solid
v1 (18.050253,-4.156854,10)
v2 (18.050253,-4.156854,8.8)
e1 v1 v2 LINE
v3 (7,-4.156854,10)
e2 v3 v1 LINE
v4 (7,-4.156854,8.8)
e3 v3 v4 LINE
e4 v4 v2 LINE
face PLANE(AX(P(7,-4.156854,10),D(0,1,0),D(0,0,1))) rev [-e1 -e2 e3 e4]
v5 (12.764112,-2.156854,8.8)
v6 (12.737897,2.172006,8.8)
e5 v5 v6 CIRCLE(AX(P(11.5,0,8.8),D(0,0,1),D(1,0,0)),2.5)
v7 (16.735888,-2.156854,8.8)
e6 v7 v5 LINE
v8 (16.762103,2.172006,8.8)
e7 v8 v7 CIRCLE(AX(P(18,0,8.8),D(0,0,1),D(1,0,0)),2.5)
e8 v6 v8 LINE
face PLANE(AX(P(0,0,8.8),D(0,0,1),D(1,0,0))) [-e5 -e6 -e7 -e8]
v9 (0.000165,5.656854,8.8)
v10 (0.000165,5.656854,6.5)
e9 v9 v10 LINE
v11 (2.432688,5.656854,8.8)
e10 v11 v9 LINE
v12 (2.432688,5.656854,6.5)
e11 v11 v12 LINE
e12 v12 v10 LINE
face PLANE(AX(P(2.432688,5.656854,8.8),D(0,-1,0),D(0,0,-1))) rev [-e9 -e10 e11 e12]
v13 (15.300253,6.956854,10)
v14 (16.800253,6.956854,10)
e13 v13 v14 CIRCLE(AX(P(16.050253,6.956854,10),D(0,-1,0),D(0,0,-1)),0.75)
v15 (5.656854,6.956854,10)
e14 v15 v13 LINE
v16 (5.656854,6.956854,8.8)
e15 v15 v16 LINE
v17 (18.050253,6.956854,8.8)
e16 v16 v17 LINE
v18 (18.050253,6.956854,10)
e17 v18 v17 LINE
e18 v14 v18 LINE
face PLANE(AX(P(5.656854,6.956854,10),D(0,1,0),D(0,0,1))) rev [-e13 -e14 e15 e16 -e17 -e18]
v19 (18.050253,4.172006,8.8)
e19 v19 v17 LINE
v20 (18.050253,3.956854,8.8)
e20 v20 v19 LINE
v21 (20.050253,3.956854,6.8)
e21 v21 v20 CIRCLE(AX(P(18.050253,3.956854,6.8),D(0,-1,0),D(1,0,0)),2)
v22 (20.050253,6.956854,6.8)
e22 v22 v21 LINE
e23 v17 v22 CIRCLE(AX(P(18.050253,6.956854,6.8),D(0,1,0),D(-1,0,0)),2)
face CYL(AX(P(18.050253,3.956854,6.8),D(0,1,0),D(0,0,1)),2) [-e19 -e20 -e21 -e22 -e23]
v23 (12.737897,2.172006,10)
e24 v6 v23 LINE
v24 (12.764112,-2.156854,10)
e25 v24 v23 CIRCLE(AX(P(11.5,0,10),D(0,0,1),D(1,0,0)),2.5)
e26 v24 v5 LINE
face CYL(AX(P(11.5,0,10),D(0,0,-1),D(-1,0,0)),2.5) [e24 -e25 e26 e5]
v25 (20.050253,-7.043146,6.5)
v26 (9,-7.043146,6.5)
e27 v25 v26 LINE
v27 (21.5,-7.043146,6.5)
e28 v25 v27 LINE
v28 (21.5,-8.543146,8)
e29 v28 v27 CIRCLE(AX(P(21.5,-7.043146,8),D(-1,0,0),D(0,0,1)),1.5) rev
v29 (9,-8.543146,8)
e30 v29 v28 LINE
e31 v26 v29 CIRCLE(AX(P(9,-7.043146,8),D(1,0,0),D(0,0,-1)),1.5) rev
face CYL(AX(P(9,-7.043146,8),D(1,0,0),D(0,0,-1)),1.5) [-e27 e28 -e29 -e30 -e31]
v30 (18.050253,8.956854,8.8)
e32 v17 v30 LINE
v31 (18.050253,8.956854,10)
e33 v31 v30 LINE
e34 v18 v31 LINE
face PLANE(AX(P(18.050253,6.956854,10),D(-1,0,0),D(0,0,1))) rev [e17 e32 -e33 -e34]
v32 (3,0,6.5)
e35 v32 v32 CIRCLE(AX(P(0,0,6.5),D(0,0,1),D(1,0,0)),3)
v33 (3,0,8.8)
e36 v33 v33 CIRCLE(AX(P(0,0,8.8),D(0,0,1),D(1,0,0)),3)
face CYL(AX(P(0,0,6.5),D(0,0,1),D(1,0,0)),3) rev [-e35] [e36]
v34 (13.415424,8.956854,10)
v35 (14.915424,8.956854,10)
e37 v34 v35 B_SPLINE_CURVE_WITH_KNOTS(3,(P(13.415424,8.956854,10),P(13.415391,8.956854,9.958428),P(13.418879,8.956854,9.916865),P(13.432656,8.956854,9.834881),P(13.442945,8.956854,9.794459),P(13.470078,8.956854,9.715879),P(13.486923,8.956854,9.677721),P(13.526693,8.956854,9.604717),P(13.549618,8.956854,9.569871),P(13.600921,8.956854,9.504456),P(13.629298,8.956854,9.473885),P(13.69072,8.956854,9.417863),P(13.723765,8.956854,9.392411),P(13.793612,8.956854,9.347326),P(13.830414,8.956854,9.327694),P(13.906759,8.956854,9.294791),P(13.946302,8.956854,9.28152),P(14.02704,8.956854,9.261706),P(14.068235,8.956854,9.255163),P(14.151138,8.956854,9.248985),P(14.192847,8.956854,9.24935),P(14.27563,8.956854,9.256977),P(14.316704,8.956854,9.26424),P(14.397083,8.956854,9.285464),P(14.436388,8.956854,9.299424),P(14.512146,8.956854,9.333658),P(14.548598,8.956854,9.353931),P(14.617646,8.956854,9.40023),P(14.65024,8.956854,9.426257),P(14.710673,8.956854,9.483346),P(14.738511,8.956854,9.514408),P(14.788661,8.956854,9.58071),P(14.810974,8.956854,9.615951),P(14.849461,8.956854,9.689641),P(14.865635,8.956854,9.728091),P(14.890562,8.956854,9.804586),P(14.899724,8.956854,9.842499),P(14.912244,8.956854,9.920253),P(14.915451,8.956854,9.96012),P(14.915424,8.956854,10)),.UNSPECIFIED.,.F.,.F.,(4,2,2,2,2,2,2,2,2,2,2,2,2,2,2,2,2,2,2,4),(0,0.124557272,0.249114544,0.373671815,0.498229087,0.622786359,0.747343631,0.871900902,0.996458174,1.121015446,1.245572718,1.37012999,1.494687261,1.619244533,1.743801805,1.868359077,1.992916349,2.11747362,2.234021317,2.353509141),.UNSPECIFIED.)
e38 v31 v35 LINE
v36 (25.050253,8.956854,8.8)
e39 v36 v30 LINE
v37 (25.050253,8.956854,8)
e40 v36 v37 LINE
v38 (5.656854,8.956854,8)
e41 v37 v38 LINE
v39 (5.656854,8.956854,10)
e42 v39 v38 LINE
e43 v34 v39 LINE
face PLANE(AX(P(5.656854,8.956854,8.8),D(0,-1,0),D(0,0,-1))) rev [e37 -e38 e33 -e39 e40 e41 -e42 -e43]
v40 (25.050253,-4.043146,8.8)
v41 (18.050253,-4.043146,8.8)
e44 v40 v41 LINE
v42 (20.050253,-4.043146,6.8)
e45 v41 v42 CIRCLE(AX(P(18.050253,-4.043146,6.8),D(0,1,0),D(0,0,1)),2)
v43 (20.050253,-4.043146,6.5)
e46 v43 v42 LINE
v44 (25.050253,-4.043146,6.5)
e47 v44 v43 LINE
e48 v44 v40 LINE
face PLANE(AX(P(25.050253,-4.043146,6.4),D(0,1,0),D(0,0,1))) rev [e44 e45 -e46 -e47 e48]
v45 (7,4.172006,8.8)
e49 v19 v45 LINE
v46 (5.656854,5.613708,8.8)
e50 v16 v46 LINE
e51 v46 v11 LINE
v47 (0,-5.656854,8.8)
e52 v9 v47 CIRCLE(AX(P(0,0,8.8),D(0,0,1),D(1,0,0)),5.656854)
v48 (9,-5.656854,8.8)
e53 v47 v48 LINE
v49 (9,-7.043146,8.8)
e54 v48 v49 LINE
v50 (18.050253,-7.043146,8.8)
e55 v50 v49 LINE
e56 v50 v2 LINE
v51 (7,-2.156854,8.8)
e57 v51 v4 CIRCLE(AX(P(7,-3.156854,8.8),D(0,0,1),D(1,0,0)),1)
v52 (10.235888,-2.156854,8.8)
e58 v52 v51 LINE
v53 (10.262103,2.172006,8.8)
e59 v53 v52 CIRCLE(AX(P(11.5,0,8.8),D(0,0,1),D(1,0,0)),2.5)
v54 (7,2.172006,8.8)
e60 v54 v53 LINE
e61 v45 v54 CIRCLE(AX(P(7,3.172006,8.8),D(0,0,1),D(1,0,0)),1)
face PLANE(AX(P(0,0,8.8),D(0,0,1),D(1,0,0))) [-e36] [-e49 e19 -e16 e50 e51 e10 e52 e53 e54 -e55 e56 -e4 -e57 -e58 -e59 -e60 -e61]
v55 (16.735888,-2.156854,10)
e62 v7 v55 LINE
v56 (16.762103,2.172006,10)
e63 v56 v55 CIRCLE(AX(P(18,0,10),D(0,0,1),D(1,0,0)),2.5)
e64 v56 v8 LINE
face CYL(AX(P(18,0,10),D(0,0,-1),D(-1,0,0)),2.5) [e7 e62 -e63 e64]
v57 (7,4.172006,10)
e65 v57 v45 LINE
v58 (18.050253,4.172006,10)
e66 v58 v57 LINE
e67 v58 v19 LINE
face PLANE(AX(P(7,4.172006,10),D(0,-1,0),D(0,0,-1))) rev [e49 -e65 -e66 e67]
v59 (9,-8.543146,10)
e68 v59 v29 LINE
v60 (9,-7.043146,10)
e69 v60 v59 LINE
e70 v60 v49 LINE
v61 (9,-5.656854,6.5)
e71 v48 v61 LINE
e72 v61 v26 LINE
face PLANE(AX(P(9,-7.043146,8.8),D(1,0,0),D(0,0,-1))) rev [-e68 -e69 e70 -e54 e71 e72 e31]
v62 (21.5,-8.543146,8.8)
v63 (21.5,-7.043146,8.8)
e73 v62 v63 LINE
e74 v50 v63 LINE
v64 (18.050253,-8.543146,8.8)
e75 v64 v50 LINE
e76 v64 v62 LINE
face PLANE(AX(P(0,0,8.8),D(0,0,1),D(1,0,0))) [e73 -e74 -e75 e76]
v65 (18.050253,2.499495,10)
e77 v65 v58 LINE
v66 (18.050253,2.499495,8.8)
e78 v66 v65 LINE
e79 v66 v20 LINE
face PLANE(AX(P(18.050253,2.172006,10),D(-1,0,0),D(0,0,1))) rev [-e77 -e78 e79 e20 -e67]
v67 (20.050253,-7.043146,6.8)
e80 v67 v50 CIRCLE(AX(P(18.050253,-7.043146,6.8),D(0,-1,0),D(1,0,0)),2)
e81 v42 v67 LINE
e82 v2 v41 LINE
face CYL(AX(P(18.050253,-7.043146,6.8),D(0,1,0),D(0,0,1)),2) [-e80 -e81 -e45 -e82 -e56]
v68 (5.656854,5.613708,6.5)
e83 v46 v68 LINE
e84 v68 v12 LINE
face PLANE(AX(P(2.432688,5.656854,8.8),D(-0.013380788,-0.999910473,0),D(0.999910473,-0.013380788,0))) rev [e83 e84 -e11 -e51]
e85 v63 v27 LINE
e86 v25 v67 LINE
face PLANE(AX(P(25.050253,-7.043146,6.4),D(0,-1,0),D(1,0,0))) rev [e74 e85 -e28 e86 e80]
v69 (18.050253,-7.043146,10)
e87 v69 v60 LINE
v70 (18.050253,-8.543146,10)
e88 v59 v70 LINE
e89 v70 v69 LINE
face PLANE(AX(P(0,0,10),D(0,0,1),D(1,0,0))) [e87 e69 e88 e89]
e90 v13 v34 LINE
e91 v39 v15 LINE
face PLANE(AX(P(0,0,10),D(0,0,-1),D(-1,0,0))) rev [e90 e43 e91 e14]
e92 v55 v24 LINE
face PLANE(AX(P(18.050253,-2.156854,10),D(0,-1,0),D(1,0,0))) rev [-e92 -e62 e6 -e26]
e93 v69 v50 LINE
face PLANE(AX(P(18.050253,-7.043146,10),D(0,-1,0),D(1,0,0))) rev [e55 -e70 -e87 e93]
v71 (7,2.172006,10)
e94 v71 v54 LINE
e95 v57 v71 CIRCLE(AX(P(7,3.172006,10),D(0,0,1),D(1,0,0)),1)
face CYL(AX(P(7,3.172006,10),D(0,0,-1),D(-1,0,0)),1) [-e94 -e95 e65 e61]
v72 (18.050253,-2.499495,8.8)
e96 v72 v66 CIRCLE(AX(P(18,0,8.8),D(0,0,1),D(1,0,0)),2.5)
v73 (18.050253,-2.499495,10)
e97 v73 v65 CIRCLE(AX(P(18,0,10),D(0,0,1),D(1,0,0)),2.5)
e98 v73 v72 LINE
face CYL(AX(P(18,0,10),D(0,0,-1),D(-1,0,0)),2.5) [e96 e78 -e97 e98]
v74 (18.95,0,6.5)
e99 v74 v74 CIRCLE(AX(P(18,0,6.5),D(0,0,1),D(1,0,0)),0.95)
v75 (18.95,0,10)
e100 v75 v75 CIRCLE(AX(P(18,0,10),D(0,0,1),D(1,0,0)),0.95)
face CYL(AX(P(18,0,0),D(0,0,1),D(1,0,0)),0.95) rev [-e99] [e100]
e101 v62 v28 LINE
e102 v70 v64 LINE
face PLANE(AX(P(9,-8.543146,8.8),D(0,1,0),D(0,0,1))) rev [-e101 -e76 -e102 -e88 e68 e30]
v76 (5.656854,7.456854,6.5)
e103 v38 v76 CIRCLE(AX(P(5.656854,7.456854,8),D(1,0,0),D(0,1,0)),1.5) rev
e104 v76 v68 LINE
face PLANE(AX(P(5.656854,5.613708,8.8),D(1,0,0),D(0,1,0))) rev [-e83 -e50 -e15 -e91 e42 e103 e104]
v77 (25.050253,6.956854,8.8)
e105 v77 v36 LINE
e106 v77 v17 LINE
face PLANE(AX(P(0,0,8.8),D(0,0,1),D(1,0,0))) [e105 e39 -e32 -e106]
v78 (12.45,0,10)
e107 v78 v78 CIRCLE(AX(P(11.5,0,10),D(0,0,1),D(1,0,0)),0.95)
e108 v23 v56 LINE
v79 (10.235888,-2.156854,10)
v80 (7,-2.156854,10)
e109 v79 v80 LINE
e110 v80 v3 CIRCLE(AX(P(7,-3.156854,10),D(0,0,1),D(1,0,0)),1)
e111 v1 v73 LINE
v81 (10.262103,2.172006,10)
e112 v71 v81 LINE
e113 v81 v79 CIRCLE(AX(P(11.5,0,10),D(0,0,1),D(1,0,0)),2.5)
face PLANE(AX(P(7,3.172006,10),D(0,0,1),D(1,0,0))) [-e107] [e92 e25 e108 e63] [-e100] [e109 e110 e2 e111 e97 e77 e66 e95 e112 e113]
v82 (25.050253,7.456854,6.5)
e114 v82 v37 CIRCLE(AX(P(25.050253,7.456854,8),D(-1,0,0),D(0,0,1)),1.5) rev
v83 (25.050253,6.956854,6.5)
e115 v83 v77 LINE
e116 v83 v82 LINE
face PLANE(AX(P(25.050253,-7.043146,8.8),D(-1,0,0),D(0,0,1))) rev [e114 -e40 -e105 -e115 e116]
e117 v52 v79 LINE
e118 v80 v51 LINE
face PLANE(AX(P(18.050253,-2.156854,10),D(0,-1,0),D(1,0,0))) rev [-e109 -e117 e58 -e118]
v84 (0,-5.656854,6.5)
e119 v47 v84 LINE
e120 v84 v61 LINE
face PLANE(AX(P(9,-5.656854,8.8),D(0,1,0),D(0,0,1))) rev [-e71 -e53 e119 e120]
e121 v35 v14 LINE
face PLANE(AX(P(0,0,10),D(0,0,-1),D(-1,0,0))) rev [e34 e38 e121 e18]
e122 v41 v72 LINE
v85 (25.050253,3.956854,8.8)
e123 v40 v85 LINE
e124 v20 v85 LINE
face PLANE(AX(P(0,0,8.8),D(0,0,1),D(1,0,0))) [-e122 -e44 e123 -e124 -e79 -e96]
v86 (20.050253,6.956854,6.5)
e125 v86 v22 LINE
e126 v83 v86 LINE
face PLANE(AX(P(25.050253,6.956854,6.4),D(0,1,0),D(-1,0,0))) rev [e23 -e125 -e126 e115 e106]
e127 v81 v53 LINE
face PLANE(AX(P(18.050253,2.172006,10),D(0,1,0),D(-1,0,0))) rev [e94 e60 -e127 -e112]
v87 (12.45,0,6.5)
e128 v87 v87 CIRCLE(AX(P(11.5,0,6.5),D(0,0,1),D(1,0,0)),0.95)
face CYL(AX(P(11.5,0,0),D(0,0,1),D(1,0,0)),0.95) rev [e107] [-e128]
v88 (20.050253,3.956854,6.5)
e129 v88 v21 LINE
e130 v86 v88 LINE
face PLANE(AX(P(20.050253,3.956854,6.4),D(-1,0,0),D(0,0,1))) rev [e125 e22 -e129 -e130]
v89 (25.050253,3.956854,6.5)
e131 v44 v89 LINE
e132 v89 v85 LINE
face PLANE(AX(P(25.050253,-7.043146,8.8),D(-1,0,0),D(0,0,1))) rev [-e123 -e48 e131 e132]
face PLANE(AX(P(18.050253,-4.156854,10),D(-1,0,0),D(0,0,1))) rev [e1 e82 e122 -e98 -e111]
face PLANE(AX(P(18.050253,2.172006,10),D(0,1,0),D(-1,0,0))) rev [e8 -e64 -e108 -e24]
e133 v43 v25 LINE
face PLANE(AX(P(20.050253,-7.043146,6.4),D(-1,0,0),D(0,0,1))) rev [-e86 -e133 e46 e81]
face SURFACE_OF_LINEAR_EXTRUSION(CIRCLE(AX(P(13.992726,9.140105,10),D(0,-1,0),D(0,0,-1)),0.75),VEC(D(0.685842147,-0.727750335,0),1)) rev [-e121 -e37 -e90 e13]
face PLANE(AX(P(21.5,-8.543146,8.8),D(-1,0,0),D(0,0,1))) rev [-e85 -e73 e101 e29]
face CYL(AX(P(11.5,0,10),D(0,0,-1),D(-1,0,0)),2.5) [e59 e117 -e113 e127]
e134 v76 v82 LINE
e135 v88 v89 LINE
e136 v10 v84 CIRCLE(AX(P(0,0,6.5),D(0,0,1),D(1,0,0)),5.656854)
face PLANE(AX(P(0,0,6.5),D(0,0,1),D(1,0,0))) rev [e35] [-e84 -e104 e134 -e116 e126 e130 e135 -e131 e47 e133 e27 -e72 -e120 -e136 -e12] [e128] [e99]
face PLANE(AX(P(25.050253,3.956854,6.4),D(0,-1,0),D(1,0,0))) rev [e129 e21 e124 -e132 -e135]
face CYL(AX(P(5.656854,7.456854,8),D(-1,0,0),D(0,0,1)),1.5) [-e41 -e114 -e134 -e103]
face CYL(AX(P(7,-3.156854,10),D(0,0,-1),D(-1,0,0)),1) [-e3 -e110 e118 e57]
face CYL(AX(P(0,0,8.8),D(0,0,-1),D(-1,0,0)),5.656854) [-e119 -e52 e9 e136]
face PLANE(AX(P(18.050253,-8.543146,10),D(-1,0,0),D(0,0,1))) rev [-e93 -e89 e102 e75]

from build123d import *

# Parameters (mm, degrees)
BOSS_EXTRUDE1_DEPTH      = 2
BOSS_EXTRUDE6_DEPTH      = 4.5
CUT_EXTRUDE6_DEPTH       = 4.5
BOSS_EXTRUDE14_DEPTH     = 2.3
SKETCH32_R               = 3
CUT_EXTRUDE7_DEPTH       = 2.3
SKETCH33_W               = 12.393398282201806
SKETCH33_H               = 2.000000000000001
BOSS_EXTRUDE15_DEPTH     = 1.2
CUT_EXTRUDE8_DEPTH       = 2.4
SKETCH43_R               = 2.5000000000000004
SKETCH43_R_2             = 2.4999999999999982
BOSS_EXTRUDE17_DEPTH     = 1.2
CUT_EXTRUDE11_DEPTH      = 29.420773915365164
CUT_EXTRUDE11_DEPTH_BACK = 29.420773915365164
SKETCH44_R               = 0.9499999999999992
SKETCH44_R_2             = 0.9500000000000008
SKETCH49_R               = 0.7500000000000021
CUT_EXTRUDE13_DEPTH      = 3
FILLET1_R                = 1.5
FILLET3_START            = -1
FILLET3_DEPTH            = 8
FILLET3_START_2          = 5
FILLET3_2_DEPTH          = 21
FILLET3_3_DEPTH          = 8
SKETCH45_R               = 1.9999999999999996
SKETCH45_R_2             = 2.000000000000003
CUT_EXTRUDE15_DEPTH      = 4
FILLET4_R                = 2
BOSS_EXTRUDE18_DEPTH     = 12
SKETCH52_R               = 1.500000000000004
SKETCH52_R_2             = 1.5000000000000007
CUT_EXTRUDE16_DEPTH      = 12


with BuildPart() as part:
    # Sketch3 → Boss-Extrude1 (new body)
    with BuildSketch(Plane.XY):
        with BuildLine():
            Line((8.000000000000002, 0), (8.999999999999995, -2.5431457505076205))
            Line((8.999999999999995, -2.5431457505076205), (8.999999999999995, -7.043145750507605))
            Line((8.999999999999995, -7.043145750507605), (21.50000000000004, -7.043145750507604))
            Line((21.50000000000004, -7.043145750507604), (25.05025253169418, -7.043145750507604))
            Line((25.05025253169418, -7.043145750507604), (25.050252531694177, 7.456854249492383))
            Line((25.050252531694177, 7.456854249492383), (5.656854249492373, 7.456854249492379))
            Line((5.656854249492373, 7.456854249492379), (5.656854249492376, 5.656854249492382))
            ThreePointArc((5.656854249492376, 5.656854249492382), (7.391036260090296, 3.061467458920721), (8.000000000000002, 0))
        make_face()
    extrude(amount=BOSS_EXTRUDE1_DEPTH)

    # Sketch22 → Boss-Extrude6 (add)
    with BuildSketch(Plane.XY.offset(2)):
        with BuildLine():
            Line((5.656854249492378, 7.456854249492383), (21.500000000000025, 7.456854249492383))
            Line((21.500000000000025, 7.456854249492383), (25.050252531694177, 7.456854249492383))
            Line((25.050252531694177, 7.456854249492383), (25.05025253169418, -7.043145750507604))
            Line((25.05025253169418, -7.043145750507604), (8.999999999999995, -7.043145750507605))
            Line((8.999999999999995, -7.043145750507605), (8.999999999999995, -2.5431457505076205))
            Line((8.999999999999995, -2.5431457505076205), (7.999999999999998, 0))
            ThreePointArc((7.999999999999998, 0), (7.391036260090291, 3.061467458920719), (5.656854249492376, 5.656854249492382))
            Line((5.656854249492376, 5.656854249492382), (5.656854249492378, 7.456854249492383))
        make_face()
    extrude(amount=BOSS_EXTRUDE6_DEPTH)

    # Sketch26 → Cut-Extrude6 (cut)
    with BuildSketch(Plane.XY.offset(2)):
        Polygon((18.098080447707712, 5.299999999999999), (2.5300524575164793, 5.299999999999999), (2.5300524575164793, 4), (18.098080447707712, 4), (25.05025253169419, 4.000000000000001), (25.05025253169419, 5.299999999999999), align=None)
    extrude(amount=CUT_EXTRUDE6_DEPTH, mode=Mode.SUBTRACT)


with BuildPart() as body_2:
    # Sketch31 → Boss-Extrude14 (new body)
    with BuildSketch(Plane.XY.offset(6.5)):
        with BuildLine():
            Line((2.4326880657739025, 5.656854247099344), (0.00016454221484158, 5.656854247099344))
            ThreePointArc((0.00016454221484158, 5.656854247099344), (-5.656854248894122, 8.227110743131e-05), (0, -5.656854249492382))
            Line((0, -5.656854249492382), (9.000000000000004, -5.656854249492382))
            Line((9.000000000000004, -5.656854249492382), (8.999999999999995, -7.043145750507605))
            Line((8.999999999999995, -7.043145750507605), (8.999999999999995, -8.543145750507605))
            Line((8.999999999999995, -8.543145750507605), (21.50000000000004, -8.543145750507605))
            Line((21.50000000000004, -8.543145750507605), (21.50000000000004, -7.043145750507605))
            Line((21.50000000000004, -7.043145750507605), (25.05025253169418, -7.043145750507604))
            Line((25.05025253169418, -7.043145750507604), (25.05025253169418, 8.956854249492379))
            Line((25.05025253169418, 8.956854249492379), (5.656854249492376, 8.956854249492379))
            Line((5.656854249492376, 8.956854249492379), (5.656854249492378, 7.456854249492383))
            Line((5.656854249492378, 7.456854249492383), (5.656854249492376, 5.613708498984764))
            Line((5.656854249492376, 5.613708498984764), (2.4326880657739025, 5.656854247099344))
        make_face()
    extrude(amount=BOSS_EXTRUDE14_DEPTH)

    # Sketch32 → Cut-Extrude7 (cut)
    with BuildSketch(Plane.XY.offset(8.799999999999999)):
        Circle(SKETCH32_R)
    extrude(amount=-CUT_EXTRUDE7_DEPTH, mode=Mode.SUBTRACT)

    # Sketch33 → Boss-Extrude15 (add)
    with BuildSketch(Plane.XY.offset(8.799999999999999)):
        with Locations((11.853553390593277, 7.956854249492379)):
            Rectangle(SKETCH33_W, SKETCH33_H)
        Polygon((9.000000000000004, -7.043145750507606), (9.000000000000004, -8.543145750507605), (18.05025253169418, -8.543145750507605), (18.05025253169418, -7.0431457505076045), align=None)
        with BuildLine():
            Line((7.000000000000003, -4.156854249492383), (18.05025253169419, -4.156854249492383))
            Line((18.05025253169419, -4.156854249492383), (18.05025253169419, -2.1568542494923824))
            Line((18.05025253169419, -2.1568542494923824), (7.000000000000003, -2.1568542494923832))
            ThreePointArc((7.000000000000003, -2.1568542494923832), (6.000000000000003, -3.1568542494923832), (7.000000000000003, -4.156854249492383))
        make_face()
        with BuildLine():
            Line((18.05025253169419, 2.172006245196199), (7.000000000000003, 2.172006245196201))
            ThreePointArc((7.000000000000003, 2.172006245196201), (6.0000000000000036, 3.1720062451962), (7.000000000000003, 4.172006245196199))
            Line((7.000000000000003, 4.172006245196199), (18.05025253169419, 4.172006245196199))
            Line((18.05025253169419, 4.172006245196199), (18.05025253169419, 2.172006245196199))
        make_face()
    extrude(amount=BOSS_EXTRUDE15_DEPTH)


with BuildPart() as cut_extrude8_tool:
    # Sketch35 → Cut-Extrude8 (new body)
    with BuildSketch(Plane.XY.offset(8.799999999999999)):
        Polygon((25.05025253169418, 3.956854249492379), (25.05025253169418, 6.9568542494923795), (20.05025253169418, 6.956854249492378), (20.05025253169418, 3.9568542494923773), align=None)
        Polygon((25.05025253169418, -7.043145750507604), (20.05025253169419, -7.0431457505076045), (20.05025253169419, -4.043145750507604), (25.05025253169418, -4.043145750507604), align=None)
    extrude(amount=-CUT_EXTRUDE8_DEPTH)


with BuildPart() as part_1:
    add(part.part)

    # Cut-Extrude8: cut by cut_extrude8_tool
    add(cut_extrude8_tool.part, mode=Mode.SUBTRACT)


with BuildPart() as body_2_1:
    add(body_2.part)

    # Cut-Extrude8: cut by cut_extrude8_tool
    add(cut_extrude8_tool.part, mode=Mode.SUBTRACT)

    # Sketch43 → Boss-Extrude17 (add)
    with BuildSketch(Plane.XY.offset(8.799999999999999)):
        with Locations((11.500000000000004, 0)):
            Circle(SKETCH43_R)
        with Locations((18.000000000000004, 0)):
            Circle(SKETCH43_R_2)
    extrude(amount=BOSS_EXTRUDE17_DEPTH)


with BuildPart() as cut_extrude11_tool:
    # Sketch44 → Cut-Extrude11 (new, two sides: drawn at the far end of the back side and taken through both)
    with BuildSketch(Plane.XY.offset(9.999999999999998).offset(-CUT_EXTRUDE11_DEPTH_BACK)):
        with Locations((11.500000000000004, 0)):
            Circle(SKETCH44_R)
        with Locations((18.000000000000004, 0)):
            Circle(SKETCH44_R_2)
    extrude(amount=CUT_EXTRUDE11_DEPTH + CUT_EXTRUDE11_DEPTH_BACK)


with BuildPart() as part_2:
    add(part_1.part)

    # Cut-Extrude11: cut by cut_extrude11_tool
    add(cut_extrude11_tool.part, mode=Mode.SUBTRACT)

    # Fillet3: read off the stored shape, not the designer's step
    # Fillet3 outline → Fillet3 (cut)
    with BuildSketch(Plane.XY.offset(FILLET3_START)):
        with BuildLine():
            Line((9, -7.043145751), (10, -7.043145751))
            add(Edge.make_bspline(
                [(10, -7.043145751), (8.99999999999999, -7.043145750507609), (9, -6.043145751)],
                knots=[0, 0, 0, 1, 1, 1], degree=2, weights=[1, 0.7071067811865481, 1]))
            Line((9, -6.043145751), (9, -7.043145751))
        make_face()
        with BuildLine():
            Line((5.656854249, 7.456854249), (5.656854249, 6.456854249))
            add(Edge.make_bspline(
                [(5.656854249, 6.456854249), (5.656854249492369, 7.4568542494923795), (6.656854249, 7.456854249)],
                knots=[0, 0, 0, 1, 1, 1], degree=2, weights=[1, 0.707106781186547, 1]))
            Line((6.656854249, 7.456854249), (5.656854249, 7.456854249))
        make_face()
    extrude(amount=FILLET3_DEPTH, mode=Mode.SUBTRACT)

    # Fillet3 2 outline → Fillet3 2 (cut)
    with BuildSketch(Plane.YZ.offset(FILLET3_START_2)):
        with BuildLine():
            Line((-7.043145751, 0), (-6.043145751, 0))
            add(Edge.make_bspline(
                [(-6.043145751, 0), (-7.0431457505076045, 0), (-7.043145751, 1)],
                knots=[0, 0, 0, 1, 1, 1], degree=2, weights=[1, 0.707106781186548, 1]))
            Line((-7.043145751, 1), (-7.043145751, 0))
        make_face()
        with BuildLine():
            add(Edge.make_bspline(
                [(6.456854249, 0), (7.456854249492381, 0), (7.456854249, 1)],
                knots=[0, 0, 0, 1, 1, 1], degree=2, weights=[1, 0.707106781186548, 1]))
            Line((6.456854249, 0), (7.456854249, 0))
            Line((7.456854249, 0), (7.456854249, 1))
        make_face()
    extrude(amount=FILLET3_2_DEPTH, mode=Mode.SUBTRACT)

    # Fillet3 3 outline → Fillet3 3 (cut)
    with BuildSketch(Plane.XY.offset(FILLET3_START)):
        with BuildLine():
            Line((25.050252532, -7.043145751), (25.050252532, -6.043145751))
            add(Edge.make_bspline(
                [(25.050252532, -6.043145751), (25.050252531694195, -7.0431457505076045), (24.050252532, -7.043145751)],
                knots=[0, 0, 0, 1, 1, 1], degree=2, weights=[1, 0.707106781186548, 1]))
            Line((24.050252532, -7.043145751), (25.050252532, -7.043145751))
        make_face()
        with BuildLine():
            Line((25.050252532, 6.456854249), (25.050252532, 7.456854249))
            Line((25.050252532, 7.456854249), (24.050252532, 7.456854249))
            add(Edge.make_bspline(
                [(24.050252532, 7.456854249), (24.23662286224227, 7.456854249492371), (24.442904569552457, 7.413222711328381), (24.646119560607424, 7.308816022097408), (24.808964717093836, 7.142726196138974), (24.971827345010716, 6.860639849810825), (25.01301948040526, 6.758429238057051), (25.038618001980854, 6.6546327736033515), (25.050252531694174, 6.553326631418876), (25.050252532, 6.456854249)],
                knots=[0, 0, 0, 0, 0, 0, 0.6589186227127712, 0.6589186227127712, 0.6589186227127712, 0.6589186227127712, 1.0000000000000395, 1.0000000000000395, 1.0000000000000395, 1.0000000000000395, 1.0000000000000395, 1.0000000000000395], degree=5, weights=[1, 1.0000000000000024, 0.9950915544751191, 0.9930584097693568, 0.9999999999999981, 1.0000000000000009, 0.9997935626898684, 0.9999244387002607, 0.9999999999999992, 1]))
        make_face()
    extrude(amount=FILLET3_3_DEPTH, mode=Mode.SUBTRACT)

    # Sketch45 → Cut-Extrude15 (cut)
    with BuildSketch(Plane(origin=(0, 0, 0), x_dir=(-1, 0, 0), z_dir=(0, 0, -1))):
        with Locations((-11.500000000000004, 0)):
            Circle(SKETCH45_R)
        with Locations((-18.000000000000004, 0)):
            Circle(SKETCH45_R_2)
    extrude(amount=-CUT_EXTRUDE15_DEPTH, mode=Mode.SUBTRACT)

    # Sketch51 → Boss-Extrude18 (add)
    with BuildSketch(Plane(origin=(25.05025253169418, 5.99e-15, 0), x_dir=(0, 0, -1), z_dir=(1, 2.4e-16, 0))):
        Polygon((-9.5e-16, 3.9999999999999947), (3e-17, -4.000000000000005), (-3, -4.000000000000005), (-3.000000000000001, 3.9999999999999942), align=None)
    extrude(amount=BOSS_EXTRUDE18_DEPTH)

    # Sketch52 → Cut-Extrude16 (cut)
    with BuildSketch(Plane(origin=(0, 0, 0), x_dir=(-1, 0, 0), z_dir=(0, 0, -1))):
        with Locations((-34.05025253169418, 3.47e-15)):
            Circle(SKETCH52_R)
        with Locations((-28.05025253169418, 3.9e-15)):
            Circle(SKETCH52_R_2)
    extrude(amount=-CUT_EXTRUDE16_DEPTH, mode=Mode.SUBTRACT)


with BuildPart() as body_2_2:
    add(body_2_1.part)

    # Cut-Extrude11: cut by cut_extrude11_tool
    add(cut_extrude11_tool.part, mode=Mode.SUBTRACT)

    # Sketch49 → Cut-Extrude13 (cut, along a direction that is not the sketch's normal)
    with BuildSketch(Plane.XZ.offset(-6.956854249492379)):
        with Locations((16.05025253169419, 9.999999999999998)):
            Circle(SKETCH49_R)
    extrude(amount=-CUT_EXTRUDE13_DEPTH, dir=(0.6858421465414155, -0.7277503349552398, 0), mode=Mode.SUBTRACT)

    # Fillet1
    fillet1_edges = [body_2_2.edges().sort_by_distance(p)[0] for p in [
        (15.353553390593278, 8.956854249492379, 6.5),
        (15.250000000000018, -8.543145750507605, 6.5),
    ]]
    fillet(fillet1_edges, radius=FILLET1_R)

    # Fillet4
    fillet4_edges = [body_2_2.edges().sort_by_distance(p)[0] for p in [
        (20.05025253169418, 5.456854249492378, 8.799999999999999),
        (20.05025253169419, -5.543145750507604, 8.799999999999999),
    ]]
    fillet(fillet4_edges, radius=FILLET4_R - 0.0001)  # a hair under: the kernel refuses the full size


solid = body_2_2.part
